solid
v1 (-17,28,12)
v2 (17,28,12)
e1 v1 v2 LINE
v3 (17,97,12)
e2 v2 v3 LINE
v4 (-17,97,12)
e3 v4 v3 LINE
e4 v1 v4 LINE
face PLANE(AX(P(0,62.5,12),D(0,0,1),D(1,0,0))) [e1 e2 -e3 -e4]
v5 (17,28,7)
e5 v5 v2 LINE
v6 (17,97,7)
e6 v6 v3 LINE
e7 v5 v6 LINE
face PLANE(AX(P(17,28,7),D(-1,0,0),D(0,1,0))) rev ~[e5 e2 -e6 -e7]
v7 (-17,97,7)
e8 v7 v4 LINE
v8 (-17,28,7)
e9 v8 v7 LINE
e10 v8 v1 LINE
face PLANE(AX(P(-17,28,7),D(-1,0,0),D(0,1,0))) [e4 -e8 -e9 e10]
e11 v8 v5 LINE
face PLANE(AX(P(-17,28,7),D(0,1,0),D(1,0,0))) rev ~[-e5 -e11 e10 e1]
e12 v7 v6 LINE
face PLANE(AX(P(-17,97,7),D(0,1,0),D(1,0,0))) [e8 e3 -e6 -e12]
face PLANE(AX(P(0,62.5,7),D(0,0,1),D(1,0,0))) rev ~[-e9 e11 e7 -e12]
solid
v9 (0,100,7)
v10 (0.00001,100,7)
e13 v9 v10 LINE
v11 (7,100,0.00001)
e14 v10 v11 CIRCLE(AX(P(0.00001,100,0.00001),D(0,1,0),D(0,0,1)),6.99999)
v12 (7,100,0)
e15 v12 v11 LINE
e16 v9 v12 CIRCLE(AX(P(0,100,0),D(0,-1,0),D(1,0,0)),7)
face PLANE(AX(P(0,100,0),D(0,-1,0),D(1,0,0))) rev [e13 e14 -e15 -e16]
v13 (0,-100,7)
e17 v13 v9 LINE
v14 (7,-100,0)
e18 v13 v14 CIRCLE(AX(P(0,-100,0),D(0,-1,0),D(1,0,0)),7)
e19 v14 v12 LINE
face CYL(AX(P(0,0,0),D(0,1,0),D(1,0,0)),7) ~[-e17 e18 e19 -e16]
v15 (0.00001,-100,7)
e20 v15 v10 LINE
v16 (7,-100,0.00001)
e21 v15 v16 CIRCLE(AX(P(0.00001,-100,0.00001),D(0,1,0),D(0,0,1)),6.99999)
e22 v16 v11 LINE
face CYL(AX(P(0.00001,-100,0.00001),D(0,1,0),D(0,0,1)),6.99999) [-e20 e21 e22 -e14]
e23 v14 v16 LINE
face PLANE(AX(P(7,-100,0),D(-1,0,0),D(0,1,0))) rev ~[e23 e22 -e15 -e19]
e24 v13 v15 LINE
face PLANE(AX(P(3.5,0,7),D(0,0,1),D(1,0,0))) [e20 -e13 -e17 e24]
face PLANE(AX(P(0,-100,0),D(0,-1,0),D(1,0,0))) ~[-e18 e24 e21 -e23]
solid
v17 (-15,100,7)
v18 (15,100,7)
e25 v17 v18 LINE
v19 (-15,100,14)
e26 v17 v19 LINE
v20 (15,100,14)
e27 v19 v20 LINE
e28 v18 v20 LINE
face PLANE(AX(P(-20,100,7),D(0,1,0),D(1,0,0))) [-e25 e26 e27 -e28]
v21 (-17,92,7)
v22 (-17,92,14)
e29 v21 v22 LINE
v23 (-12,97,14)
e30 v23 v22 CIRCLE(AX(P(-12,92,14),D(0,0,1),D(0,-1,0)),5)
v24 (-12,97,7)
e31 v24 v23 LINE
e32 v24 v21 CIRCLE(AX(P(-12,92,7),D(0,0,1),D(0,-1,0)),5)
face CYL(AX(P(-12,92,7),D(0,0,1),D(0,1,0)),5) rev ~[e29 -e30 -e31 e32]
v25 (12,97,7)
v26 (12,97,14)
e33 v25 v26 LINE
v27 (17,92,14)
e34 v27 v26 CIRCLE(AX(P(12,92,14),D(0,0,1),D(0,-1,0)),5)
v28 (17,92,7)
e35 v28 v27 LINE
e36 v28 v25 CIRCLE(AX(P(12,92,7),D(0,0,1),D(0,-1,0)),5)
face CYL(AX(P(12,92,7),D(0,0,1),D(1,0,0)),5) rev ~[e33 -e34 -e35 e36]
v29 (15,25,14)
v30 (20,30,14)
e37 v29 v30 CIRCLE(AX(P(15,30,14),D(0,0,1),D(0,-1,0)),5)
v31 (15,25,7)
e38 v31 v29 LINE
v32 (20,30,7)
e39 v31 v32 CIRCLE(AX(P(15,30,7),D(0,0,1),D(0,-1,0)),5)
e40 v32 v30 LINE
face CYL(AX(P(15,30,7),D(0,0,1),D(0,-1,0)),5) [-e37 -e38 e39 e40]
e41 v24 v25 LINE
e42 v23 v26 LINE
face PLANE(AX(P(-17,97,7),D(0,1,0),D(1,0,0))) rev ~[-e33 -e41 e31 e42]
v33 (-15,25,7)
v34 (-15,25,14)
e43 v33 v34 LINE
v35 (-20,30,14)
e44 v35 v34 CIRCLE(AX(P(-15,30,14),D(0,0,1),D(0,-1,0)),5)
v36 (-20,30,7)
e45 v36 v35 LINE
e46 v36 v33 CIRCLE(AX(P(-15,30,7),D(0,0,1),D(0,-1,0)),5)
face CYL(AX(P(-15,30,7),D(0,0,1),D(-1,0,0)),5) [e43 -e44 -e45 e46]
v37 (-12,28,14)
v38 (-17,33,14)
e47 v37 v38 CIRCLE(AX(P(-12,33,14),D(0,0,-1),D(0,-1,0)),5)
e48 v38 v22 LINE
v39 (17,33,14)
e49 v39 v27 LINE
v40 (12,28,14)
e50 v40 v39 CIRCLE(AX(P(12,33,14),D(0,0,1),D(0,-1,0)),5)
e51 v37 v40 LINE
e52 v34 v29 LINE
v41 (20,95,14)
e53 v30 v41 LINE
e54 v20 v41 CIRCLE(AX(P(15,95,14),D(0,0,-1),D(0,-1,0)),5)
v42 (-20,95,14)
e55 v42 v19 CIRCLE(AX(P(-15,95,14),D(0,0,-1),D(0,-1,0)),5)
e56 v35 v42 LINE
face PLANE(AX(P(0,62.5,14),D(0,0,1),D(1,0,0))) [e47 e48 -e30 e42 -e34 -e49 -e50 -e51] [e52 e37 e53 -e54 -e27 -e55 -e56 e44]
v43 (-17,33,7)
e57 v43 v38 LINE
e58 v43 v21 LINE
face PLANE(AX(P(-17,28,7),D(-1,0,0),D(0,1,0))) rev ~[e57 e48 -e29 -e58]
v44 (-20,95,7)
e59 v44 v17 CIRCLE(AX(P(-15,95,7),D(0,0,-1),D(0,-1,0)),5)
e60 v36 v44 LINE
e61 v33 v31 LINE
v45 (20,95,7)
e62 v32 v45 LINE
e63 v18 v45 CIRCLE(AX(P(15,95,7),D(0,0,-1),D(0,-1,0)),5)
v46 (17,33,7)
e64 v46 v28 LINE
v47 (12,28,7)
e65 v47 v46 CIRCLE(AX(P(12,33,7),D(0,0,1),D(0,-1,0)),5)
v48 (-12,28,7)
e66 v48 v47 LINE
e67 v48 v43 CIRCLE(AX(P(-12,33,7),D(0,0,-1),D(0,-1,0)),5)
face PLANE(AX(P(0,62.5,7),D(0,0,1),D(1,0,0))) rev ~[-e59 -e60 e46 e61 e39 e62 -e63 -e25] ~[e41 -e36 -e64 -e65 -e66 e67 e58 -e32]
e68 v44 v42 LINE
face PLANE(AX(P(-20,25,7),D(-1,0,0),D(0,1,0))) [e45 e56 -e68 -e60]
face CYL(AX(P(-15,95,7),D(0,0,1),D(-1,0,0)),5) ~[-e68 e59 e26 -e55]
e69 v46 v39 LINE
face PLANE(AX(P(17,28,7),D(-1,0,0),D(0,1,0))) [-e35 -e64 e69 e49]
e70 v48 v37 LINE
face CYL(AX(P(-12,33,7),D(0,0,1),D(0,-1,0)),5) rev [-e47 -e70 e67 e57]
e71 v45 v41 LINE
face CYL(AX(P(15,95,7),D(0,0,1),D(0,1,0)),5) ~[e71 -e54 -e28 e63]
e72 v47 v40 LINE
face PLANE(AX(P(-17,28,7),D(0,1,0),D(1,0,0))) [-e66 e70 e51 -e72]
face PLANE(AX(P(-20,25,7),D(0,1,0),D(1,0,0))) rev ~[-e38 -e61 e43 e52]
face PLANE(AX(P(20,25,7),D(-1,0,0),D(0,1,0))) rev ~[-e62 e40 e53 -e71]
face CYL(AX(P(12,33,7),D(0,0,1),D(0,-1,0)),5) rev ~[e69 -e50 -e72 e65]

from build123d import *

# Parameters (mm, degrees)
F0_W     = 7
F0_H     = 200
F1_DEPTH = 7
F3_R     = 6.99999
F5_W     = 34
F5_H     = 69
F6_DEPTH = 5
F5_W_2   = 40
F5_H_2   = 75
F7_DEPTH = 7
F8_R     = 5
F9_R     = 5
F10_R    = 5
F11_R    = 5


# Not quite as in the source:
# - a fillet or chamfer is up to 0.001 mm smaller than in the source, because OpenCascade refuses the exact size


with BuildPart() as f1:
    # F0 (on Top) → F1 (new body)
    with BuildSketch(Plane.XY):
        with Locations((3.5, 0)):
            Rectangle(F0_W, F0_H)
    extrude(amount=F1_DEPTH)

    # F0 (on Top) → F2 (revolve)
    with BuildSketch(Plane.XY):
        with Locations((3.5, 0)):
            Rectangle(F0_W, F0_H)
    revolve(axis=Axis((0, 0, 0), (0, -1, 0)))

    # F3 (radius 7 in the source; OpenCascade refuses exactly that, so slightly less here)
    f3_edges = [f1.edges().sort_by_distance(p)[0] for p in [
        (7, 0, 7),
    ]]
    fillet(f3_edges, radius=F3_R)


with BuildPart() as f6:
    # F5 (on offset) → F6 (new body)
    with BuildSketch(Plane.XY.offset(7)):
        with Locations((0, 62.5)):
            Rectangle(F5_W, F5_H)
    extrude(amount=F6_DEPTH)


with BuildPart() as f7:
    # F5 (on offset) → F7 (new body)
    with BuildSketch(Plane.XY.offset(7)):
        with Locations((0, 62.5)):
            Rectangle(F5_W_2, F5_H_2)
        with Locations((0, 62.5)):
            Rectangle(F5_W, F5_H, mode=Mode.SUBTRACT)
    extrude(amount=F7_DEPTH)

    # F8
    f8_edges = [f7.edges().sort_by_distance(p)[0] for p in [
        (-17, 97, 10.5),
        (17, 28, 10.5),
        (-17, 28, 10.5),
    ]]
    fillet(f8_edges, radius=F8_R)

    # F9
    f9_edges = [f7.edges().sort_by_distance(p)[0] for p in [
        (17, 97, 10.5),
    ]]
    fillet(f9_edges, radius=F9_R)

    # F10
    f10_edges = [f7.edges().sort_by_distance(p)[0] for p in [
        (-20, 25, 10.5),
        (20, 25, 10.5),
    ]]
    fillet(f10_edges, radius=F10_R)

    # F11
    f11_edges = [f7.edges().sort_by_distance(p)[0] for p in [
        (20, 100, 10.5),
        (-20, 100, 10.5),
    ]]
    fillet(f11_edges, radius=F11_R)


solid = Compound([f1.part, f6.part, f7.part])
